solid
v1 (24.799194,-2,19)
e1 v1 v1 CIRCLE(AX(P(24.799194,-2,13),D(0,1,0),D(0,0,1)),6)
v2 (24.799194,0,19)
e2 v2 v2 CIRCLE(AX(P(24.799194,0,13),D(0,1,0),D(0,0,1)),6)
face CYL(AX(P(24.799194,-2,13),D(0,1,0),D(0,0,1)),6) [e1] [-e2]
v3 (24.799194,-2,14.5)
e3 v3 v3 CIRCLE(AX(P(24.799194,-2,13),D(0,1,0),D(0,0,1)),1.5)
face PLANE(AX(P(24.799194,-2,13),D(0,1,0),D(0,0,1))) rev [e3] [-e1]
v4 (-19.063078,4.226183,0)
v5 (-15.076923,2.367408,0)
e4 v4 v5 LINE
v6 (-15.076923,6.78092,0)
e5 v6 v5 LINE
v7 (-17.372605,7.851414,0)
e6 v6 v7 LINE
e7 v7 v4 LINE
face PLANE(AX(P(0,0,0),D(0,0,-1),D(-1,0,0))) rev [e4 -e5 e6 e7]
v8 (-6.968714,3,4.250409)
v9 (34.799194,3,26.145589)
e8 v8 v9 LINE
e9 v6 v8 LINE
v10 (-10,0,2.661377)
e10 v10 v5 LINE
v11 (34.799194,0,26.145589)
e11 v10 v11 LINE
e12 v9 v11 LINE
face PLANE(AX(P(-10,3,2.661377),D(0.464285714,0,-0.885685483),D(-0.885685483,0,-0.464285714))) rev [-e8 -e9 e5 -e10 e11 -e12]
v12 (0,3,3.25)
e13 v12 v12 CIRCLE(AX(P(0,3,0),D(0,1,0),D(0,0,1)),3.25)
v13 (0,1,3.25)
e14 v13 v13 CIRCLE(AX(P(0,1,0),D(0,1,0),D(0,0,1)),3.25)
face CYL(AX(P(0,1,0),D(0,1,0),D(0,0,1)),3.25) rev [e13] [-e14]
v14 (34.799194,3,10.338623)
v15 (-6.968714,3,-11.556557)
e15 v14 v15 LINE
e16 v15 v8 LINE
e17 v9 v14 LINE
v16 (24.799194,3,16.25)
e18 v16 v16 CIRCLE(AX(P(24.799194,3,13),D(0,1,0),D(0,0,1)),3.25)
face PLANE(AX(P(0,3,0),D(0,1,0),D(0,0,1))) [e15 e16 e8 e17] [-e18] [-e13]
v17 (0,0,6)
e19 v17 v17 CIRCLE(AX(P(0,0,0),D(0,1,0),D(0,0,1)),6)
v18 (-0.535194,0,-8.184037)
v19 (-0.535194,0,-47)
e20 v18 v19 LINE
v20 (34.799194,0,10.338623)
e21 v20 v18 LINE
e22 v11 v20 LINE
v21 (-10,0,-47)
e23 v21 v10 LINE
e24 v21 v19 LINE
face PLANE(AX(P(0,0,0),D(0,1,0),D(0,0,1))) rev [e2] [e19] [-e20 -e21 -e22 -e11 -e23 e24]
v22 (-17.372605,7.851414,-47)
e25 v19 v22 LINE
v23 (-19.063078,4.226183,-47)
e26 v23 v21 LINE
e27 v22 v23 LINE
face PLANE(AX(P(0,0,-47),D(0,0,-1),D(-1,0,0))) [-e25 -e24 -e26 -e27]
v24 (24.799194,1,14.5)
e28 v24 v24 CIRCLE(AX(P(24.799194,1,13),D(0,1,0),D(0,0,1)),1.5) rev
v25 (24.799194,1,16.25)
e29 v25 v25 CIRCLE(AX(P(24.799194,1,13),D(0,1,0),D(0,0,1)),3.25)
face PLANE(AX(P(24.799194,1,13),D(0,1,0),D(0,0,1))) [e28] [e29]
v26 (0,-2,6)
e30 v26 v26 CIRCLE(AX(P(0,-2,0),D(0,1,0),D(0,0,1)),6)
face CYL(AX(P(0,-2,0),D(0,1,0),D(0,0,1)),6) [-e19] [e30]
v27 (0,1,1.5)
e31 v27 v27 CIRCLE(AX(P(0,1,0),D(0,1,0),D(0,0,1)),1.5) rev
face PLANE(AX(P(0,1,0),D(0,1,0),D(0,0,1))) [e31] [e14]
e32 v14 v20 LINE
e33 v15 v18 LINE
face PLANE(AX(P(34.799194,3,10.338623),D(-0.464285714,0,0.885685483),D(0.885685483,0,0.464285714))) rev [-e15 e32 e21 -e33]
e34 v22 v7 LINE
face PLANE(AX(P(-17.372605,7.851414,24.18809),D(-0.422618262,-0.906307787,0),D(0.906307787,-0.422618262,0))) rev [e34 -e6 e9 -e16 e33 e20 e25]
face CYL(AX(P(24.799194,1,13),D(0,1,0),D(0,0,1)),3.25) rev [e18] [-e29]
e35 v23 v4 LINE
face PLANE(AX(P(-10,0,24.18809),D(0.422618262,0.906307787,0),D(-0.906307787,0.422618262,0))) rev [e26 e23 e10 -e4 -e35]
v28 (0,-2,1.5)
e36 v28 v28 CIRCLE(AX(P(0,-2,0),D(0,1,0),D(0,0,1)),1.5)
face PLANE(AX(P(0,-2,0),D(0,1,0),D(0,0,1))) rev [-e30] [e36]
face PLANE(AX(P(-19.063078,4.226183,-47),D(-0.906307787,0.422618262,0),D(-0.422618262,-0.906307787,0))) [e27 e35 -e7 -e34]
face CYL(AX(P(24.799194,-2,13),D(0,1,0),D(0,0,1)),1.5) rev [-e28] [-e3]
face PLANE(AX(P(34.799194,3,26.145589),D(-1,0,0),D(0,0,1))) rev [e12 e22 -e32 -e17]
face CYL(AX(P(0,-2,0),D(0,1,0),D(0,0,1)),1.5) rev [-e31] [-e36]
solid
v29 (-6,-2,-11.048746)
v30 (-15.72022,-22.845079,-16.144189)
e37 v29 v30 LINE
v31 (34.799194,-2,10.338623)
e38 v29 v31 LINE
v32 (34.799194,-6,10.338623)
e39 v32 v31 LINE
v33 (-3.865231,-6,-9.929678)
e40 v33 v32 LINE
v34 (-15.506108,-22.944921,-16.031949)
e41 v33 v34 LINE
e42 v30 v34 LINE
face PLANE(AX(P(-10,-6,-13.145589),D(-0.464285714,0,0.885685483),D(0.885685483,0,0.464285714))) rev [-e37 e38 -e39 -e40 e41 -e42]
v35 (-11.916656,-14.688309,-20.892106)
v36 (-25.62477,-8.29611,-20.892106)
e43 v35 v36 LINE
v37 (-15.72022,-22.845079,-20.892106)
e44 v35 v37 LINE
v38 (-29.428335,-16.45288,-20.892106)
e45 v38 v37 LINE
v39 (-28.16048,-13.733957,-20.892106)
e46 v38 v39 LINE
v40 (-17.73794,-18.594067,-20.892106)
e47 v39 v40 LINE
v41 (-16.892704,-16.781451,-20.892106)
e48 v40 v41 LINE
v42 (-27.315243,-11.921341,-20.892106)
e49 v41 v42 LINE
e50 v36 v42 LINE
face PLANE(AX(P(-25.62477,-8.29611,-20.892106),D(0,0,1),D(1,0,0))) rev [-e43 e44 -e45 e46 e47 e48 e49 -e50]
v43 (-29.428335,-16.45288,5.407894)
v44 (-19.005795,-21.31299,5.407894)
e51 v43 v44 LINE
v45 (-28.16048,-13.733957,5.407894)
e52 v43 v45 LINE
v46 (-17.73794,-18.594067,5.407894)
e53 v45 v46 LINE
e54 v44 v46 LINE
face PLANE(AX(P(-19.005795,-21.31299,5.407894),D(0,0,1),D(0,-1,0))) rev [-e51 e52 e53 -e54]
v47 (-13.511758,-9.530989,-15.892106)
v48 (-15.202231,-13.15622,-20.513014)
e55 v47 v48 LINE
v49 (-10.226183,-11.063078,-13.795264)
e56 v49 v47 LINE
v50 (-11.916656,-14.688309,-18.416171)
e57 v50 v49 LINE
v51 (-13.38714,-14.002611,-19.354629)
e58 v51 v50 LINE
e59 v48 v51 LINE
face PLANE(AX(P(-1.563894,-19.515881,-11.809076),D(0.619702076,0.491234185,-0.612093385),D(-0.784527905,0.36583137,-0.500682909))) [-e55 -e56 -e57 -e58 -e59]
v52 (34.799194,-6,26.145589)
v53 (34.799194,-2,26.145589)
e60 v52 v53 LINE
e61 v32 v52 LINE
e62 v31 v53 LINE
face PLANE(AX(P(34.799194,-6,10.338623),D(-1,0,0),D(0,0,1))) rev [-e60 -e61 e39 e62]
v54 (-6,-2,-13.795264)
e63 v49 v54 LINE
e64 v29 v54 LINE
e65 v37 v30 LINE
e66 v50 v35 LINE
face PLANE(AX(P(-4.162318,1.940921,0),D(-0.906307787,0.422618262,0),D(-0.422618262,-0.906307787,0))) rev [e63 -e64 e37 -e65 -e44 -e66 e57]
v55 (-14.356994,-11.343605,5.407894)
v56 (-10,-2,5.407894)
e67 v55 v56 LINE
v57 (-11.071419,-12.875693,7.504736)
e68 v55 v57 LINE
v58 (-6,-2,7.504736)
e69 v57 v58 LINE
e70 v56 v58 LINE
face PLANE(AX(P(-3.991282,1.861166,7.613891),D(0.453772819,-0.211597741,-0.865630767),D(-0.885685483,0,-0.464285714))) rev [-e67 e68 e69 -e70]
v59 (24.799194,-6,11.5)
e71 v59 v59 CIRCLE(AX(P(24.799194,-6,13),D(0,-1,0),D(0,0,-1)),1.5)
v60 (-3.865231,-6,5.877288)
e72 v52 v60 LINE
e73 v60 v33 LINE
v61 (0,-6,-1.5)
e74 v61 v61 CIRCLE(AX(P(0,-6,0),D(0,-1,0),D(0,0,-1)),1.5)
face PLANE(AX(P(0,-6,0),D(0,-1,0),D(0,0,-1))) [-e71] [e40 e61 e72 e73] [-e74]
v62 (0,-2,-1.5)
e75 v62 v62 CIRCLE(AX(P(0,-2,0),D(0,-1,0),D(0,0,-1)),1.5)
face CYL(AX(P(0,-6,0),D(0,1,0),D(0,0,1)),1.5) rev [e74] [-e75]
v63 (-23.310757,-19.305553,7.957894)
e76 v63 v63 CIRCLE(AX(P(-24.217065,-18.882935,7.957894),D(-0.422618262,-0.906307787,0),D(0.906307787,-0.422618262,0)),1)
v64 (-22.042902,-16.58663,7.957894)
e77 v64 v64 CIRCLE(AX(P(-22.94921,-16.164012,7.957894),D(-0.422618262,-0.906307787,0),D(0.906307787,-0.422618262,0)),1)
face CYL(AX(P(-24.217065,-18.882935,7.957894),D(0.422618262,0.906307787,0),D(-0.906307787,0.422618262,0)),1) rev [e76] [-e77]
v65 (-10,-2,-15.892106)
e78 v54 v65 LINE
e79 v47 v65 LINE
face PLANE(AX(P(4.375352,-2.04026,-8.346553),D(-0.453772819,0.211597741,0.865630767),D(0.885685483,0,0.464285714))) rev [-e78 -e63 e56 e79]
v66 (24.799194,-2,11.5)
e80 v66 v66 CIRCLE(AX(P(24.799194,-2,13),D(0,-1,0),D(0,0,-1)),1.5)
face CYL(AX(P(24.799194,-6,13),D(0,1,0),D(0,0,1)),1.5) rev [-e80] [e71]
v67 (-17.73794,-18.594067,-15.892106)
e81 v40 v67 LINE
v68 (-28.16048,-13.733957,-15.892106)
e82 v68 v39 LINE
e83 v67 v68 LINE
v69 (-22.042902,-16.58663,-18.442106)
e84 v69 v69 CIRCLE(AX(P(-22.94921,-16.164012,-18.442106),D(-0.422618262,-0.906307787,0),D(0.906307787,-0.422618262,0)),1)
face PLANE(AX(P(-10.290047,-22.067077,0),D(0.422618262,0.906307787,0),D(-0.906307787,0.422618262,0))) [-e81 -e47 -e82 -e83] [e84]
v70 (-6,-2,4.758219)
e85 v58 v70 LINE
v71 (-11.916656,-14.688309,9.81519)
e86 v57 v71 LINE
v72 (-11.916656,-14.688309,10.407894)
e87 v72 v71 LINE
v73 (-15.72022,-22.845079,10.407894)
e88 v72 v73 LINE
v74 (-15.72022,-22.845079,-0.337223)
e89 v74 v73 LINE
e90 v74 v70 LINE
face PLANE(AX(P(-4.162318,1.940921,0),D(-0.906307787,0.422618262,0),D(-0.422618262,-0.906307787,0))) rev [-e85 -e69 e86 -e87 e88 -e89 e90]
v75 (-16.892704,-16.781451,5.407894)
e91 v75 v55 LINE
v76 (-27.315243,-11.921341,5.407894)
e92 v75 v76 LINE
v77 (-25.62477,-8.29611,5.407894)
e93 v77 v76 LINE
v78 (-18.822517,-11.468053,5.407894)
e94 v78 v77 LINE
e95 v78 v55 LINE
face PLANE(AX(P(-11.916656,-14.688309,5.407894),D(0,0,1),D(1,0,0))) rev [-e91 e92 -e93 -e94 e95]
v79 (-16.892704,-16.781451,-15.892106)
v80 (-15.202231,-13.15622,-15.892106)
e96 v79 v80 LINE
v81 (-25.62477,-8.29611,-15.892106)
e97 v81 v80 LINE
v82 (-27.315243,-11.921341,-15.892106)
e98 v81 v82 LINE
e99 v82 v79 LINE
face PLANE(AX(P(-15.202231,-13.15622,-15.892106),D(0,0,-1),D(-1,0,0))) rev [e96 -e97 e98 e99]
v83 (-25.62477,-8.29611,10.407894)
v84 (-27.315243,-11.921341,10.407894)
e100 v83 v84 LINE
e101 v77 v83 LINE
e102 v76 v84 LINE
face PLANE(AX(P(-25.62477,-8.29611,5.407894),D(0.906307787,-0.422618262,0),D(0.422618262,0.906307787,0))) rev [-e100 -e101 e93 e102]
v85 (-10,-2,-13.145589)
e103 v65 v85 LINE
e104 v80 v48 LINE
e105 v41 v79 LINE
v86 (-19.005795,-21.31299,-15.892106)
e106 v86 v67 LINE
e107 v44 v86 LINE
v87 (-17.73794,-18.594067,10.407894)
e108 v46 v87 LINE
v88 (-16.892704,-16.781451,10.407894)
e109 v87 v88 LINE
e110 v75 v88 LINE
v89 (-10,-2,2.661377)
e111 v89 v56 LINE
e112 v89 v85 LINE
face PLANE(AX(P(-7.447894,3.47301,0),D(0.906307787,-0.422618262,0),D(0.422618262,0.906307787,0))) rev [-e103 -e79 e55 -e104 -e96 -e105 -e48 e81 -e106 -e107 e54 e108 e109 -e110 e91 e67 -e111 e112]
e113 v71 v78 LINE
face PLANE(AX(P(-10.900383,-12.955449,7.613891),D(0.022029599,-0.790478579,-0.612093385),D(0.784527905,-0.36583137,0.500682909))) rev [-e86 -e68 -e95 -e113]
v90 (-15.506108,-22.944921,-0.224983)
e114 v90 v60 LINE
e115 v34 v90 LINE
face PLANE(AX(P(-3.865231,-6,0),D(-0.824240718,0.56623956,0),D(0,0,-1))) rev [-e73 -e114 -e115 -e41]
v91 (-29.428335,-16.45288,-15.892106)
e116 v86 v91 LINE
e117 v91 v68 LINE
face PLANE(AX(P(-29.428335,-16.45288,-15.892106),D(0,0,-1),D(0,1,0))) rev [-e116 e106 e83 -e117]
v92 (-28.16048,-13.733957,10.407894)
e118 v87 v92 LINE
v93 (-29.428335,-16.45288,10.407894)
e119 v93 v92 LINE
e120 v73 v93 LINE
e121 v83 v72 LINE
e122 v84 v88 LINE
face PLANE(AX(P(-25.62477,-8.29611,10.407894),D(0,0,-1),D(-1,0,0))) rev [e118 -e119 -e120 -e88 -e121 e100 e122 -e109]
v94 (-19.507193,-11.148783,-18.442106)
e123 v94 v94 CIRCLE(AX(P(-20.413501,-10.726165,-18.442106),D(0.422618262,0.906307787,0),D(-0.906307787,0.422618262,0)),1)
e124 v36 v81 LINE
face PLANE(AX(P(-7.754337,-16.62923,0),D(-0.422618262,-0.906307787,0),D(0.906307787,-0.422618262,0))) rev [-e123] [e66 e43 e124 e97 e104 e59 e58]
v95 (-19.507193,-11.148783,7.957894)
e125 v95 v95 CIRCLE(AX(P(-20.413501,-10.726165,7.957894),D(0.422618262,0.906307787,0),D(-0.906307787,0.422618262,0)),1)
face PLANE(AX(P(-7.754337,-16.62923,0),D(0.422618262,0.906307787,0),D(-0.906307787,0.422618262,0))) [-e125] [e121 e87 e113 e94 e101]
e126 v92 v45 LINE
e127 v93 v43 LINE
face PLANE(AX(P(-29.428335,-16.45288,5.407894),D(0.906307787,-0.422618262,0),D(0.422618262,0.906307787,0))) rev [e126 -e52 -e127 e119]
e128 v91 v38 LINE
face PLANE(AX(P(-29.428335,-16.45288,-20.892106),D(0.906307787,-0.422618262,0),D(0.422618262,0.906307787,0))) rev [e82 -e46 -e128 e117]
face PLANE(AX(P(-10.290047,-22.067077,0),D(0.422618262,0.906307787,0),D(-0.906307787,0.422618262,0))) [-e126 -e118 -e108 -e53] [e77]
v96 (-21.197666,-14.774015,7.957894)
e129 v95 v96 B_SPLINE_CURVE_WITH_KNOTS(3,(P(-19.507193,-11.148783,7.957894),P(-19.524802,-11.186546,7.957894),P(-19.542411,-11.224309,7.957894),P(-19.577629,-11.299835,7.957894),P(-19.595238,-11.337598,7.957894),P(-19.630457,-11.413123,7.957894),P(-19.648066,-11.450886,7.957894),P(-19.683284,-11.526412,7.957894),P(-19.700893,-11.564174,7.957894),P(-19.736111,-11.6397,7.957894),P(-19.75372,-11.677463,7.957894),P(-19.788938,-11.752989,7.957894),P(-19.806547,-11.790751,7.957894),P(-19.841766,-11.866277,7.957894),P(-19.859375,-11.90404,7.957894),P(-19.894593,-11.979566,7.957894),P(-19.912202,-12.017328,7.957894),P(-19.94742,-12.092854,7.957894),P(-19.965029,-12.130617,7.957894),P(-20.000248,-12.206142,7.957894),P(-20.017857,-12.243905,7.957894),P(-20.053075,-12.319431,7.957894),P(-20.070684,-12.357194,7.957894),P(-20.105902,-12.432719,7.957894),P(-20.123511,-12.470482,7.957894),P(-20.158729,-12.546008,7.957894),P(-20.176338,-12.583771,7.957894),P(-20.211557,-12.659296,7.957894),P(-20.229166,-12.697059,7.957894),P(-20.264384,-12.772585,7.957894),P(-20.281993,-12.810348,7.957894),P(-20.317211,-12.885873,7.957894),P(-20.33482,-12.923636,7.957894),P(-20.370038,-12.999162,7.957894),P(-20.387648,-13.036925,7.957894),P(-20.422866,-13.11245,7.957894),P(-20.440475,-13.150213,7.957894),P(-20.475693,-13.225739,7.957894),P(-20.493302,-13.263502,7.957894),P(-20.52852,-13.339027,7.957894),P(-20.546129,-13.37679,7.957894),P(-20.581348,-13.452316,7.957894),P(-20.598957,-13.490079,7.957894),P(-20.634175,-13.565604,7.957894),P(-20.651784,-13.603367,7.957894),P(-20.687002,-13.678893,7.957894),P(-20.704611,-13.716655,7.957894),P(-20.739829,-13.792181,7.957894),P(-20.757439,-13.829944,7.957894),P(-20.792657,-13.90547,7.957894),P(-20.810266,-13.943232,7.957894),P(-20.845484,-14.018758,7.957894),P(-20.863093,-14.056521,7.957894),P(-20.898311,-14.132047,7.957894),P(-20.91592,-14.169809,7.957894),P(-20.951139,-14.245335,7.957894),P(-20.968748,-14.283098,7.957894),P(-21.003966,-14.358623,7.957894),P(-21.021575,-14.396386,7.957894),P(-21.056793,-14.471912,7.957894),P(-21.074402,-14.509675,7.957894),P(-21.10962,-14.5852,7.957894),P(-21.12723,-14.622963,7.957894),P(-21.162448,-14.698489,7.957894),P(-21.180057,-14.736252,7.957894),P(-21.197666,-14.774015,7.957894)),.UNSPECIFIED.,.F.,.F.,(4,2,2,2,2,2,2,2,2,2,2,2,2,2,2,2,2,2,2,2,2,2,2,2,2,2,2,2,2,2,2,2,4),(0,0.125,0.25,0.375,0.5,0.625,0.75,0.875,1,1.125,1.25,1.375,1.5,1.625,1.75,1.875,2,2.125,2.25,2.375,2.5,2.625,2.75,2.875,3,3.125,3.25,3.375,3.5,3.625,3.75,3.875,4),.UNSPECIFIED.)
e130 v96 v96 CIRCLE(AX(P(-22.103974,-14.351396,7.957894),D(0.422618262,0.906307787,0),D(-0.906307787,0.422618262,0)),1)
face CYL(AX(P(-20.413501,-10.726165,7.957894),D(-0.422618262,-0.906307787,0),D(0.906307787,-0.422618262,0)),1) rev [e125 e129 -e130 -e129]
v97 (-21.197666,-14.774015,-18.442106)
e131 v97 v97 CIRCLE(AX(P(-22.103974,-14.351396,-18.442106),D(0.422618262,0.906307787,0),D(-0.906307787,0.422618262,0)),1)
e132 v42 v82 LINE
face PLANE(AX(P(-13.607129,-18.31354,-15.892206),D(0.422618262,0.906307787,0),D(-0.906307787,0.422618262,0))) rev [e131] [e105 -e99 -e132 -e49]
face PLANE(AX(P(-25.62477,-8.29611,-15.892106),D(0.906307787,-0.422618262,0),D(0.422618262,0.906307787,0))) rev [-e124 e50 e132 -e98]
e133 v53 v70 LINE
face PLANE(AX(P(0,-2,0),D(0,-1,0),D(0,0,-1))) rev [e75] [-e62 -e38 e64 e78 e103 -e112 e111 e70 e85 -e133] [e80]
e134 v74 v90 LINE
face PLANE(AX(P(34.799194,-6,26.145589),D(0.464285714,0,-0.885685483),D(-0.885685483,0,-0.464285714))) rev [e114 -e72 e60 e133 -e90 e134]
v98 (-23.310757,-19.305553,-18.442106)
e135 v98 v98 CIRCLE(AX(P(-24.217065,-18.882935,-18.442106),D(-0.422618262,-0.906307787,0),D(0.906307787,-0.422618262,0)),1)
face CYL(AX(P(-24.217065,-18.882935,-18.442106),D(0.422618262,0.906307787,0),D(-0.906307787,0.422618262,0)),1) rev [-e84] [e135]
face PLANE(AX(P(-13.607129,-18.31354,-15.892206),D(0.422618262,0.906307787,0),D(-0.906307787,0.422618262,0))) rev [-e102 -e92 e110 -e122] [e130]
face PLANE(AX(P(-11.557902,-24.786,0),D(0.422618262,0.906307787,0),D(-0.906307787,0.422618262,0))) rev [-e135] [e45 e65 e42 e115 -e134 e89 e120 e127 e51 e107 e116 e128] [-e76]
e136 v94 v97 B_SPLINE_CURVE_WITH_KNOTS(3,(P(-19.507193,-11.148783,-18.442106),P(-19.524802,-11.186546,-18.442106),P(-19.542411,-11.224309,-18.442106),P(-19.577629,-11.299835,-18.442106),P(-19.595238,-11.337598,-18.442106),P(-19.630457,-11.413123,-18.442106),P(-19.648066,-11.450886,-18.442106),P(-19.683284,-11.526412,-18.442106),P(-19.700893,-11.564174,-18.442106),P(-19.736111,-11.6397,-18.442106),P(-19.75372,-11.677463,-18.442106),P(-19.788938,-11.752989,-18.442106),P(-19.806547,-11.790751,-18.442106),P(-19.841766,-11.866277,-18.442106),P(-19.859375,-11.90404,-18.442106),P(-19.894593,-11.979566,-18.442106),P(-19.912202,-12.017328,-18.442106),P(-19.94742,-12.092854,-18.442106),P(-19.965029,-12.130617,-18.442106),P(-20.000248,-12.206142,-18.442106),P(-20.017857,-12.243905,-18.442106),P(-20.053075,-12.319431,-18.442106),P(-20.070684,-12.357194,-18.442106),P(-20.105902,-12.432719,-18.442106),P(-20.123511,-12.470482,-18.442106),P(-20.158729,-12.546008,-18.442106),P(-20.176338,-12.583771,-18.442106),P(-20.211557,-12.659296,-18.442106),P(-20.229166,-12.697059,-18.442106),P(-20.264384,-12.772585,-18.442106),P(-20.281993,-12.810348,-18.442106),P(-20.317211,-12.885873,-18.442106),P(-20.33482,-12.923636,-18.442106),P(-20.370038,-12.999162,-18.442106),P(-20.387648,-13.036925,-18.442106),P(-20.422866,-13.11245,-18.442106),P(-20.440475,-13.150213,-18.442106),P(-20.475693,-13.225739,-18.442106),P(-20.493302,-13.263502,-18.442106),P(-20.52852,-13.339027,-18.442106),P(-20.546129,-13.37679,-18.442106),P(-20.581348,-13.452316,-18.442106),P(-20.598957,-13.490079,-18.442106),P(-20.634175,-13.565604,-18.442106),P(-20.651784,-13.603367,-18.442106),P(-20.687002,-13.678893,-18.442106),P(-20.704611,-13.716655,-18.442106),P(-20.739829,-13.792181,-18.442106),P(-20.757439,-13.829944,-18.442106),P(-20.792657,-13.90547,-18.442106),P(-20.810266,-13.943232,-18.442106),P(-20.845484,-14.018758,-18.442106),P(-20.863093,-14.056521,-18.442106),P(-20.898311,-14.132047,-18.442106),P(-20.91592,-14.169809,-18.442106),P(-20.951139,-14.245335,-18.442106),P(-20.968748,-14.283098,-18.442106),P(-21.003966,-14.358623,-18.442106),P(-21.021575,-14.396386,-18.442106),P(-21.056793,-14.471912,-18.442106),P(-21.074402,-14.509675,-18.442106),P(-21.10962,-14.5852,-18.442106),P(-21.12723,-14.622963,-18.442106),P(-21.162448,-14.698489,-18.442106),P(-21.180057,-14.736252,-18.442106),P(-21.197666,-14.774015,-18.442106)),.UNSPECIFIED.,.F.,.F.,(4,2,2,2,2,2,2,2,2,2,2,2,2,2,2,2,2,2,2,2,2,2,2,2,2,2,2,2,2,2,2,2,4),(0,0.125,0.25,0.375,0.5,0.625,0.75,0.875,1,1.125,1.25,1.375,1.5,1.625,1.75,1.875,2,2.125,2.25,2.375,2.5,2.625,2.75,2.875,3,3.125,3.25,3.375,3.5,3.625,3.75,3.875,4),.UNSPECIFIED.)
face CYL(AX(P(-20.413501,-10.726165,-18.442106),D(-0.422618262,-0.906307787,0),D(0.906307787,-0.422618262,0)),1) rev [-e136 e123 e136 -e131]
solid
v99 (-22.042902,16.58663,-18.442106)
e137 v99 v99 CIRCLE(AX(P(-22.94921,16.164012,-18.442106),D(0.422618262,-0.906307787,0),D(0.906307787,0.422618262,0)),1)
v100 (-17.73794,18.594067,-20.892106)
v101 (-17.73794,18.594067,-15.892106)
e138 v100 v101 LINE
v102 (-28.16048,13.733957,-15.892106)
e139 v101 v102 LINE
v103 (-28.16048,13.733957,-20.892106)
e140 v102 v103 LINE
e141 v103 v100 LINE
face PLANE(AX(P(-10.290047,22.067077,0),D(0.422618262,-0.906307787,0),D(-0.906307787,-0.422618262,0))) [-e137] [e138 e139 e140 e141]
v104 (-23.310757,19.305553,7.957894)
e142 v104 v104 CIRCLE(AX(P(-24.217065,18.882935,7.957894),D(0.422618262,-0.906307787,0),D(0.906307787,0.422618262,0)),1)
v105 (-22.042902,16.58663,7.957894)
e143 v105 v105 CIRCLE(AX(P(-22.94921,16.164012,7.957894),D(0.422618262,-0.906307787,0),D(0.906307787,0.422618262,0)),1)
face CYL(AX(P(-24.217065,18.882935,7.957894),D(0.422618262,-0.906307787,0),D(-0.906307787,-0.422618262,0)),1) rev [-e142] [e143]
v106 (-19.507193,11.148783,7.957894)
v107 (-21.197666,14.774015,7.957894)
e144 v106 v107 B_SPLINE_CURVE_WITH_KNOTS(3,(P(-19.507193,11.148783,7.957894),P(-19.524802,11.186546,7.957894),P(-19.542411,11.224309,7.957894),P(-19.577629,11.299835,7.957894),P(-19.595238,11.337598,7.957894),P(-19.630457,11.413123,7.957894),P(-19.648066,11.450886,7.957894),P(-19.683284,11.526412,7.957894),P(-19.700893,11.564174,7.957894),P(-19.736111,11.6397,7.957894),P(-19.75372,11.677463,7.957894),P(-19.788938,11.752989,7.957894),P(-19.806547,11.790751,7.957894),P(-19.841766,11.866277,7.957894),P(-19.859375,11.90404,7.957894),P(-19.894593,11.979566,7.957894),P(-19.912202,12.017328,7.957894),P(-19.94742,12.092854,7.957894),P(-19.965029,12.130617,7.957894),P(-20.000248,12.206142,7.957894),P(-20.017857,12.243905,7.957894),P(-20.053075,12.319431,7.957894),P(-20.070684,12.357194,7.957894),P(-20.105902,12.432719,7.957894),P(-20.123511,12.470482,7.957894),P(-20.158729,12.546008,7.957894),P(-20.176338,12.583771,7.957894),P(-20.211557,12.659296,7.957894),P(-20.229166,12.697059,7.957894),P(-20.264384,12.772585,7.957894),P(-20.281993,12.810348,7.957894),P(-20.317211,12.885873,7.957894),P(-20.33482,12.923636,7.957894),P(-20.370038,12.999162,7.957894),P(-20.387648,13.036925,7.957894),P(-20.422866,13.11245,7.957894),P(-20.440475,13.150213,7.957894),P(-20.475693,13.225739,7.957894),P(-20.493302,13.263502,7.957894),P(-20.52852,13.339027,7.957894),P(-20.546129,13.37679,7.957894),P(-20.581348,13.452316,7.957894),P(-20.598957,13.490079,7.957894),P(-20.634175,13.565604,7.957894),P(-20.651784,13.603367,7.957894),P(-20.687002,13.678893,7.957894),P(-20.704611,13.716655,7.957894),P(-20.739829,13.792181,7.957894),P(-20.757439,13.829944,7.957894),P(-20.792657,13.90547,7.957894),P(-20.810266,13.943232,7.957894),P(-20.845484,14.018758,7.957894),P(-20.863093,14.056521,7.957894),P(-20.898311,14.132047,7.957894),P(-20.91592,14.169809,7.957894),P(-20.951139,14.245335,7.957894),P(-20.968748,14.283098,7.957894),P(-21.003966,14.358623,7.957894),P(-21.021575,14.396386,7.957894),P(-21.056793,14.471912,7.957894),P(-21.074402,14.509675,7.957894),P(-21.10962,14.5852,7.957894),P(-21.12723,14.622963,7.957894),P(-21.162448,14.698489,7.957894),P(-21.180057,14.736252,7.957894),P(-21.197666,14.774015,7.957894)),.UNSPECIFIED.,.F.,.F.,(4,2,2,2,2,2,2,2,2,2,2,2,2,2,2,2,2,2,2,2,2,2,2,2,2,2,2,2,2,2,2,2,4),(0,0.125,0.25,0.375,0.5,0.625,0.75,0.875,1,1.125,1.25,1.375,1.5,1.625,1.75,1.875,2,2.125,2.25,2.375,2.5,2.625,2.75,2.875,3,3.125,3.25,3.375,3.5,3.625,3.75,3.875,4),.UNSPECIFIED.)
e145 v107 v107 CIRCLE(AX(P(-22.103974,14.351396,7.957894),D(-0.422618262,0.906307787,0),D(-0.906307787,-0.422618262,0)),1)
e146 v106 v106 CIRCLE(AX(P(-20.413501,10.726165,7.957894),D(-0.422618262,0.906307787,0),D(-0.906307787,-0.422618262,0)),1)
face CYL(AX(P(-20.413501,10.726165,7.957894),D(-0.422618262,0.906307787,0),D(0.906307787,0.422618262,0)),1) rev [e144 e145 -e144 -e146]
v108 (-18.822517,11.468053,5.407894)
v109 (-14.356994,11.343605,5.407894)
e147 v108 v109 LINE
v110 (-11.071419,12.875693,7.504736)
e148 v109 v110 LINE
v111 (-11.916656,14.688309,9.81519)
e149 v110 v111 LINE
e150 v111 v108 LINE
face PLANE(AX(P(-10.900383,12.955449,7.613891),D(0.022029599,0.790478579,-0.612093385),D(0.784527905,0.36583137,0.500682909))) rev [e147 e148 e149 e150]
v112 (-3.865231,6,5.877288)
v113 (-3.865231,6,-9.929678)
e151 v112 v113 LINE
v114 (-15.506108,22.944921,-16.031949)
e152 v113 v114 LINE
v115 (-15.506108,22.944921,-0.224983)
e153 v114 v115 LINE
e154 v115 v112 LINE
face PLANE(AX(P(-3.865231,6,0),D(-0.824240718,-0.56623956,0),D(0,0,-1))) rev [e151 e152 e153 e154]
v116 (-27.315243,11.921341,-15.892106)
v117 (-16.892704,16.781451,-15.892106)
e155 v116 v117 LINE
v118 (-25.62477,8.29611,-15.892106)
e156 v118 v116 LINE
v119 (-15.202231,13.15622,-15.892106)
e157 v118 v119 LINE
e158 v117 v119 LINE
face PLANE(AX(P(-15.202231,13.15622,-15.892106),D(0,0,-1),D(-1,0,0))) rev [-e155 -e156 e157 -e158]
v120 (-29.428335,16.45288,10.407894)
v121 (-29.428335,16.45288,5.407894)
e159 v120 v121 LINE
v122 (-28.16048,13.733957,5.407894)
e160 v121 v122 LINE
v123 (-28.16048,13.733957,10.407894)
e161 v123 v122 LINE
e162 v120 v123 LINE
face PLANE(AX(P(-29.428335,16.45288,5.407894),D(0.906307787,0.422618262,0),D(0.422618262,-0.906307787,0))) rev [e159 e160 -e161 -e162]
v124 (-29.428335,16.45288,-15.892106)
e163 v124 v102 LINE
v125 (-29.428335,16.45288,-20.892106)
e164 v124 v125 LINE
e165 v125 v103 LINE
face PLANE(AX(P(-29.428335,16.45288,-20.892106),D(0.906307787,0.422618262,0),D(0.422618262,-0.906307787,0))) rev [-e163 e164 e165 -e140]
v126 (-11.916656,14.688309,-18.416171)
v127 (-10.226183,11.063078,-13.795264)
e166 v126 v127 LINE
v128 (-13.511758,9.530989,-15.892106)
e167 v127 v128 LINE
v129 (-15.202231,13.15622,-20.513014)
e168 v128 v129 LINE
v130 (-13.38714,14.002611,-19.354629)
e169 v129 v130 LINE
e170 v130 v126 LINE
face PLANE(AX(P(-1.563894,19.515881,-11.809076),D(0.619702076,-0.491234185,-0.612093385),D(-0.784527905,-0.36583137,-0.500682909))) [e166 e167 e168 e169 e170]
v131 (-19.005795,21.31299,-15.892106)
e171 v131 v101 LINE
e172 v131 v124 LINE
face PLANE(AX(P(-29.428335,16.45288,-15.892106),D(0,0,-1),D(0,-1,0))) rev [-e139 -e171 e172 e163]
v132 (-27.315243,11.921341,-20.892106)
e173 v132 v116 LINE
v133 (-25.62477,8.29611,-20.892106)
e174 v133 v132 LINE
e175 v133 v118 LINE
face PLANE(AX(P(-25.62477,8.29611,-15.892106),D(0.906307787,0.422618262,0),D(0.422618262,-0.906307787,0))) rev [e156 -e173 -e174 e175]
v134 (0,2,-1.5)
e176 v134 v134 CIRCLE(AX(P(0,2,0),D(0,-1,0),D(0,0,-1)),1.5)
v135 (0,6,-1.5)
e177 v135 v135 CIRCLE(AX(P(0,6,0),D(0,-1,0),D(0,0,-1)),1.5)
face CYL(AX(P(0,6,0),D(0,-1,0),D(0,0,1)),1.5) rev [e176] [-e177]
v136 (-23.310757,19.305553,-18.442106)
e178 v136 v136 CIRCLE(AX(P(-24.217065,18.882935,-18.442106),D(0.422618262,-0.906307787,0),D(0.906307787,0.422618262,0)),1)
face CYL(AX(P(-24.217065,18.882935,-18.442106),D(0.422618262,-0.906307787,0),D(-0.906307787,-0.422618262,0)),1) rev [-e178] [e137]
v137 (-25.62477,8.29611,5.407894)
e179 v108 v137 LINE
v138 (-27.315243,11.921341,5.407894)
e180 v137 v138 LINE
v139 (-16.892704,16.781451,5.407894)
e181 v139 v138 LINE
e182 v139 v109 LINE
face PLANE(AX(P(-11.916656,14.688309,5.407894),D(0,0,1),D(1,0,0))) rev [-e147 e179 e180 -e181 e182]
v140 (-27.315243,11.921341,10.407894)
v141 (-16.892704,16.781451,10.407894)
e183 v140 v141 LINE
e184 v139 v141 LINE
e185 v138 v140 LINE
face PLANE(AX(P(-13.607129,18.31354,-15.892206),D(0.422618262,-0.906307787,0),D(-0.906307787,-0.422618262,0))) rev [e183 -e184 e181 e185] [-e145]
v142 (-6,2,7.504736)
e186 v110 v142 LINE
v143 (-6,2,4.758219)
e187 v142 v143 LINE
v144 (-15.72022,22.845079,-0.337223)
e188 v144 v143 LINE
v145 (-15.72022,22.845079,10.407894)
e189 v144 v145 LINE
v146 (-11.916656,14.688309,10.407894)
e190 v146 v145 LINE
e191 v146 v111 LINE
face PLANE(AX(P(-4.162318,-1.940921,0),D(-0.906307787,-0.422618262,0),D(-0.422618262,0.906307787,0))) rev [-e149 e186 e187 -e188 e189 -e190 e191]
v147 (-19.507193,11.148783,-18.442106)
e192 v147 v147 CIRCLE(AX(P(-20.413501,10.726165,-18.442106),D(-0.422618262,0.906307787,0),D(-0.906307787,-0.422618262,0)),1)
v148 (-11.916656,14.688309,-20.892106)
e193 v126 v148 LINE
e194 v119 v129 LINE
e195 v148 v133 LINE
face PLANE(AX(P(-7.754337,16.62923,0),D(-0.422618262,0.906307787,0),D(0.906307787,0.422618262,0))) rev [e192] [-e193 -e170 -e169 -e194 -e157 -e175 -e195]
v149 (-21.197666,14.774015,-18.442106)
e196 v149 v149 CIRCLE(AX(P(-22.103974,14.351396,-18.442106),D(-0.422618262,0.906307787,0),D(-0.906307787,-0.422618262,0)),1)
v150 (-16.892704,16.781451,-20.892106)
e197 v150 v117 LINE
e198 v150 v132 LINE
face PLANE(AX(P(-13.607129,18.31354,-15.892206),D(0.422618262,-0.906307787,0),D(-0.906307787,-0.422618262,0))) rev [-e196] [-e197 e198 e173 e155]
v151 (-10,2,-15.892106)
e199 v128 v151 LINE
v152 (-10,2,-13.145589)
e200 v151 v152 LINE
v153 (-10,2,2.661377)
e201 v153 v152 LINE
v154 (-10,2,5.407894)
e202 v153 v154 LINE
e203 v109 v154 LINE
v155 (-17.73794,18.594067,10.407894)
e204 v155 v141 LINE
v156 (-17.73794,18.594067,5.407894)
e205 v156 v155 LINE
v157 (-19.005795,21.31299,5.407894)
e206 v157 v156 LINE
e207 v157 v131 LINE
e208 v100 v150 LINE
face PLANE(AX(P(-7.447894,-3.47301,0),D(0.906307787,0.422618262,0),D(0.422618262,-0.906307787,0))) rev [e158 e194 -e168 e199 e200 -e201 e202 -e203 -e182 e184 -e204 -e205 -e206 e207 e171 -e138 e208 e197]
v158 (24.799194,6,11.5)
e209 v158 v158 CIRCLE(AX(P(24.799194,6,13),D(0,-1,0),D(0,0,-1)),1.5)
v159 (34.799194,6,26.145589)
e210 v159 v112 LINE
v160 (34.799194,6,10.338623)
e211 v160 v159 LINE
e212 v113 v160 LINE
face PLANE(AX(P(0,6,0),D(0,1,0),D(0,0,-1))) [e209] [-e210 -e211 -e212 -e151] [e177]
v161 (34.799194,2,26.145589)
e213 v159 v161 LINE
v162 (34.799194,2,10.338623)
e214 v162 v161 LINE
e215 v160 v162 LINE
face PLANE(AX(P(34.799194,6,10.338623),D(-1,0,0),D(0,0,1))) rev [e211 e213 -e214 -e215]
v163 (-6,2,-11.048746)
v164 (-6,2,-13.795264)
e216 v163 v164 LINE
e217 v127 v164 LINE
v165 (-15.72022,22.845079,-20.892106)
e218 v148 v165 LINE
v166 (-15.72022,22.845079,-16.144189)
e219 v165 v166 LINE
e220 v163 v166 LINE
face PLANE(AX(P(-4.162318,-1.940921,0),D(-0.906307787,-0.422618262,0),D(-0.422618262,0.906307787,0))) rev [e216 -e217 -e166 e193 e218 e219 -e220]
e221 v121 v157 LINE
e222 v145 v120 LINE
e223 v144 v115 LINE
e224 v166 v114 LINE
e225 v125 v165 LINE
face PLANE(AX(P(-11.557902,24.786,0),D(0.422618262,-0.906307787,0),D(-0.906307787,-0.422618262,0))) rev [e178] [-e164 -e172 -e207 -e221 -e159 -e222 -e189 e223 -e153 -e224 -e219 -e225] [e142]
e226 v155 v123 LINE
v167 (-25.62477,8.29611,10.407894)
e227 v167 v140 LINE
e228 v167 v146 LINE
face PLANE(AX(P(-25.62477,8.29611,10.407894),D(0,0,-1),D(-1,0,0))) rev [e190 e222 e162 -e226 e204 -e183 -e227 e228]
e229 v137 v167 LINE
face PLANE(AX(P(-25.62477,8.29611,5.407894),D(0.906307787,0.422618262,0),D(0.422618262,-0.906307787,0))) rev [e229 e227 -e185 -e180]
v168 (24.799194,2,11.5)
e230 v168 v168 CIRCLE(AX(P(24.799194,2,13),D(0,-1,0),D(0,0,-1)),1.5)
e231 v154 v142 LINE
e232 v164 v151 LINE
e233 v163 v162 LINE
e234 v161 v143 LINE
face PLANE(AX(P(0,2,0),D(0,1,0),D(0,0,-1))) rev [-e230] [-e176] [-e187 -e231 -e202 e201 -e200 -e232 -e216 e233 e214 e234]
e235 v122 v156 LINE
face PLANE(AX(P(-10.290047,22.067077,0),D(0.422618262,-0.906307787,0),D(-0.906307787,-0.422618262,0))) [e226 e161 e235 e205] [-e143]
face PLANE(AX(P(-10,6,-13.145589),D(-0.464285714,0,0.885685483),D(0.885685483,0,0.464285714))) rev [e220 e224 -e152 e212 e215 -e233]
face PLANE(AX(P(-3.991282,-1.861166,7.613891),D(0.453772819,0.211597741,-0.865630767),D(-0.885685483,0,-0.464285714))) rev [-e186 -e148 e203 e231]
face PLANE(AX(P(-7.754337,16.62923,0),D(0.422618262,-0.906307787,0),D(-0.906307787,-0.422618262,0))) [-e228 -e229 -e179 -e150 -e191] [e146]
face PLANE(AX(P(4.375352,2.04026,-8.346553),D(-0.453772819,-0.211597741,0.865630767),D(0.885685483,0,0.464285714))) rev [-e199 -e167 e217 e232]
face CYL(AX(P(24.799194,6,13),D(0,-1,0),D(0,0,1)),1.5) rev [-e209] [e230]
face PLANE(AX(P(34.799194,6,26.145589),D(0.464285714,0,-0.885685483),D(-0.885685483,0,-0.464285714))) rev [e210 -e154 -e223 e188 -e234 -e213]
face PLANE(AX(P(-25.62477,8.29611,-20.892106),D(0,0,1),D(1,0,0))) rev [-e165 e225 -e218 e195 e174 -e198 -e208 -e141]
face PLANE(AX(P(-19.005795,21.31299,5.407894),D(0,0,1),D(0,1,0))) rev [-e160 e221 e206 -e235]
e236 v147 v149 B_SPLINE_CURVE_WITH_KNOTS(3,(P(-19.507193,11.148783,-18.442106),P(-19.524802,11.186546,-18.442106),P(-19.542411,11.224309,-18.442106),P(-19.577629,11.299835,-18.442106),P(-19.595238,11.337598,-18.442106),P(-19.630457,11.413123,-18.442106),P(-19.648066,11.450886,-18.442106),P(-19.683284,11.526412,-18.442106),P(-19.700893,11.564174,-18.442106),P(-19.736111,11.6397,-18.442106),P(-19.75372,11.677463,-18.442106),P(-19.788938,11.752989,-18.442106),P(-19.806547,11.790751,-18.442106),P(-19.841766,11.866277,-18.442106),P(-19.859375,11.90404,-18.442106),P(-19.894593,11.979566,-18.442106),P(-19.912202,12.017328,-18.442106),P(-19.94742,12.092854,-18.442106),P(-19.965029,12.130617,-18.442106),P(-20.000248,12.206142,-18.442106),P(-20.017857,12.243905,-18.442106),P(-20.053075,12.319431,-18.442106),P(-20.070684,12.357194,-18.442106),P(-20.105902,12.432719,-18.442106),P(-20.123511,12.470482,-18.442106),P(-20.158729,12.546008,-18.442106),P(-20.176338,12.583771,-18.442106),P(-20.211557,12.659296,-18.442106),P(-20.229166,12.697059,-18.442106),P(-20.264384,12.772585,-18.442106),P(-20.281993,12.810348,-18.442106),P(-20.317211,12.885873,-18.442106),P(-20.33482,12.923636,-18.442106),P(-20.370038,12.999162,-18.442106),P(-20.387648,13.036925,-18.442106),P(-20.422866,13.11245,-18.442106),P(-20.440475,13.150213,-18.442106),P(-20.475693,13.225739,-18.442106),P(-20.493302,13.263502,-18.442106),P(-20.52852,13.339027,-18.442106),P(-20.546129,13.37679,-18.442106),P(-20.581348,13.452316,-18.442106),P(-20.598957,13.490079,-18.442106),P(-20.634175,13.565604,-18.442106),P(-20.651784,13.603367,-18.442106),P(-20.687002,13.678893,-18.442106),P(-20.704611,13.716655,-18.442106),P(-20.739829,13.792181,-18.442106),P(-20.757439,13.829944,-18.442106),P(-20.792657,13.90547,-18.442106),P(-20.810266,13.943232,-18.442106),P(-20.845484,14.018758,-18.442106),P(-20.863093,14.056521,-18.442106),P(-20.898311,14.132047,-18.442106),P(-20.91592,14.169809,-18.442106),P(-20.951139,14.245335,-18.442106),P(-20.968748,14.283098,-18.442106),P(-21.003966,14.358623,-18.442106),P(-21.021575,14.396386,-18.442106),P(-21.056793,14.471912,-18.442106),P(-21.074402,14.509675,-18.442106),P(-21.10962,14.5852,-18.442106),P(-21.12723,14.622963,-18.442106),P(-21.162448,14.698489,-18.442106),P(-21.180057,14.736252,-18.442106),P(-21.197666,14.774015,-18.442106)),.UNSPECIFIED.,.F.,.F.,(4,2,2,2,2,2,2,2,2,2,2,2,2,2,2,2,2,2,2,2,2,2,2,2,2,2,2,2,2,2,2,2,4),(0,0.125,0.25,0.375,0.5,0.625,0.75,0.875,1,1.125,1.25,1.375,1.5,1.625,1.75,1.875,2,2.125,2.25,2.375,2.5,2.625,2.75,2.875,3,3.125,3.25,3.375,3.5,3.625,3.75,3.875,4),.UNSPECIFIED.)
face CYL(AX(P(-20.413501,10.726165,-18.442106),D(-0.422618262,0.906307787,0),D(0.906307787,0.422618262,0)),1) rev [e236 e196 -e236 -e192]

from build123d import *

# Parameters (mm, degrees)
BOSS_EXTRUDE1_DEPTH             = 3
SKETCH1_R                       = 6
BOSS_EXTRUDE3_DEPTH             = 2
SKETCH4_R                       = 1.5
CUT_EXTRUDE1_DEPTH              = 44.812962497
SKETCH5_R                       = 3.25
CUT_EXTRUDE2_DEPTH              = 2
SKETCH6_R                       = 1.5
BOSS_EXTRUDE4_DEPTH             = 4
CUT_EXTRUDE3_DEPTH              = 48.222467532
CUT_EXTRUDE3_DEPTH_BACK         = 48.222467532
SKETCH9_W                       = 15.125231148
SKETCH9_H                       = 5
SKETCH9_R                       = 1
BOSS_EXTRUDE6_DEPTH             = 4
SKETCH10_W                      = 3.625231148
SKETCH10_H                      = 31.3
BOSS_EXTRUDE7_DEPTH             = 2
SKETCH11_R                      = 1
BOSS_EXTRUDE8_DEPTH             = 3
CHAMFER2_SIZE                   = 4
CHAMFER3_SIZE                   = 2
CHAMFER4_SIZE                   = 4
CHAMFER4_SIZE_2                 = 20
BOSS_EXTRUDE9_DEPTH             = 47
BOSS_EXTRUDE9_DIRECTION_2_REACH = 51.204
SKETCH19_R                      = 3.25
CUT_EXTRUDE4_DEPTH              = 64.192904103
SKETCH20_R                      = 1.5
CUT_EXTRUDE5_DEPTH              = 64.192904103


with BuildPart() as part:
    # Sketch3 → Boss-Extrude1 (new body)
    with BuildSketch(Plane(origin=(0, 0, 0), x_dir=(1, 0, 0), z_dir=(0, 1, 0))):
        Polygon((-10, 13.145588768), (-10, -2.661376867), (34.799193535, -26.145588768), (34.799193535, -10.338623133), align=None)
    extrude(amount=BOSS_EXTRUDE1_DEPTH)

    # Sketch1 → Boss-Extrude3 (add)
    with BuildSketch(Plane(origin=(0, 0, 0), x_dir=(1, 0, 0), z_dir=(0, 1, 0))):
        with Locations(Location((0, 0, 0), (0, 0, 270))):
            Circle(SKETCH1_R)
        with Locations(Location((24.799193535, -13, 0), (0, 0, 270))):
            Circle(SKETCH1_R)
    extrude(amount=-BOSS_EXTRUDE3_DEPTH)

    # Sketch4 → Cut-Extrude1 (cut, through all)
    with BuildSketch(Plane(origin=(0, 3, 0), x_dir=(1, 0, 0), z_dir=(0, 1, 0))):
        with Locations(Location((0, 0, 0), (0, 0, 270))):
            Circle(SKETCH4_R)
        with Locations(Location((24.799193535, -13, 0), (0, 0, 270))):
            Circle(SKETCH4_R)
    extrude(amount=-CUT_EXTRUDE1_DEPTH, mode=Mode.SUBTRACT)

    # Sketch5 → Cut-Extrude2 (cut)
    with BuildSketch(Plane(origin=(0, 3, 0), x_dir=(1, 0, 0), z_dir=(0, 1, 0))):
        with Locations(Location((0, 0, 0), (0, 0, 270))):
            Circle(SKETCH5_R)
        with Locations(Location((24.799193535, -13, 0), (0, 0, 270))):
            Circle(SKETCH5_R)
    extrude(amount=-CUT_EXTRUDE2_DEPTH, mode=Mode.SUBTRACT)

    # Sketch18 → Boss-Extrude9 (add)
    with BuildSketch(Plane.XY):
        Polygon((-10, 0), (-19.06307787, 4.226182617), (-17.372604823, 7.851413766), (-0.535193667, 0), align=None)
    extrude(amount=-BOSS_EXTRUDE9_DEPTH)

    # Boss-Extrude9 direction 2: up to this face of the body (flat: up to its plane)
    boss_extrude9_direction_2_end = Plane(part.part.faces().sort_by_distance((12.399596768, 1.5, 14.403482818))[0])
    # Sketch18 → Boss-Extrude9 direction 2 (add, up to the picked face)
    with BuildSketch(Plane.XY, mode=Mode.PRIVATE) as boss_extrude9_direction_2_sk1:
        Polygon((-10, 0), (-19.06307787, 4.226182617), (-17.372604823, 7.851413766), (-0.535193667, 0), align=None)
    boss_extrude9_direction_2_tool1 = split(extrude(boss_extrude9_direction_2_sk1.sketch, amount=BOSS_EXTRUDE9_DIRECTION_2_REACH, mode=Mode.PRIVATE), bisect_by=boss_extrude9_direction_2_end, keep=Keep.BOTH, mode=Mode.PRIVATE)
    add(boss_extrude9_direction_2_tool1.solids().sort_by(Axis((-11.463687, 3.110079, 0), (0, 0, 1)))[0])

    # Sketch19 → Cut-Extrude4 (cut, through all)
    with BuildSketch(Plane(origin=(0, 1, 0), x_dir=(1, 0, 0), z_dir=(0, 1, 0))):
        with Locations(Location((0, 0, 0), (0, 0, 270))):
            Circle(SKETCH19_R)
    extrude(amount=CUT_EXTRUDE4_DEPTH, mode=Mode.SUBTRACT)

    # Sketch20 → Cut-Extrude5 (cut, through all)
    with BuildSketch(Plane(origin=(0, 1, 0), x_dir=(1, 0, 0), z_dir=(0, 1, 0))):
        with Locations(Location((0, 0, 0), (0, 0, 90))):
            Circle(SKETCH20_R)
    extrude(amount=-CUT_EXTRUDE5_DEPTH, mode=Mode.SUBTRACT)


with BuildPart() as body_2:
    # Sketch6 → Boss-Extrude4 (new body)
    with BuildSketch(Plane.XZ.offset(2)):
        Polygon((-10, 2.661376867), (-10, -13.145588768), (34.799193535, 10.338623133), (34.799193535, 26.145588768), align=None)
        with Locations(Location((0, 0, 0), (0, 0, 270))):
            Circle(SKETCH6_R, mode=Mode.SUBTRACT)
        with Locations(Location((24.799193535, 13, 0), (0, 0, 270))):
            Circle(SKETCH6_R, mode=Mode.SUBTRACT)
    extrude(amount=BOSS_EXTRUDE4_DEPTH)

    # Sketch16 → Loft1 section 0
    with BuildSketch(Plane(origin=(0, -18.313540167, 0), x_dir=(-1, 0, 0), z_dir=(0, -1, 0))):
        with BuildLine():
            Line((13.607128711, -7.50473643), (13.607128711, 13.79526357))
            Line((13.607128711, 13.79526357), (17.607128711, 15.892105951))
            Line((17.607128711, 15.892105951), (17.607128711, -5.407894049))
            Line((17.607128711, -5.407894049), (13.607128711, -7.50473643))
        make_face()
    # Sketch7 → Loft1 section 1
    with BuildSketch(Plane(origin=(0, -2, 0), x_dir=(1, 0, 0), z_dir=(0, 1, 0))):
        with BuildLine():
            Line((-10, 15.892105951), (-10, -5.407894049))
            Line((-10, -5.407894049), (-6, -7.50473643))
            Line((-6, -7.50473643), (-6, 13.79526357))
            Line((-6, 13.79526357), (-10, 15.892105951))
        make_face()
    loft()

    # Sketch17 → Cut-Extrude3 (cut, two sides: drawn at the far end of the back side and taken through both)
    with BuildSketch(Plane.XY.offset(-CUT_EXTRUDE3_DEPTH_BACK)):
        Polygon((-17.607128711, -18.313540167), (-13.607128711, -18.313540167), (-16.892703931, -16.78145128), align=None)
    extrude(amount=CUT_EXTRUDE3_DEPTH + CUT_EXTRUDE3_DEPTH_BACK, mode=Mode.SUBTRACT)

    # Sketch9 → Boss-Extrude6 (add)
    # profile 1 of 2: a face of its own
    with BuildSketch(Plane(origin=(-26.705419865, -12.205706693, 0), x_dir=(-0.9063077870366525, 0.42261826174069417, 0), z_dir=(0.4226182617406941, 0.9063077870366524, 0))):
        with Locations((-6.889749661, 7.907894049)):
            Rectangle(SKETCH9_W, SKETCH9_H)
        with Locations(Location((-5.077134087, 7.957894049, 0), (0, 0, 180))):
            Circle(SKETCH9_R, mode=Mode.SUBTRACT)
    # profile 2 of 2: a face of its own
    with BuildSketch(Plane(origin=(-26.705419865, -12.205706693, 0), x_dir=(-0.9063077870366525, 0.42261826174069417, 0), z_dir=(0.4226182617406941, 0.9063077870366524, 0))):
        Polygon((-10.827134087, -15.892105951), (0.672865913, -15.892105951), (0.672865913, -20.892105951), (-14.452365235, -20.892105951), (-14.452365235, -15.892105951), (-14.452365235, -13.79526357), align=None)
        with Locations(Location((-5.077134087, -18.442105951, 0), (0, 0, 180))):
            Circle(SKETCH9_R, mode=Mode.SUBTRACT)
    extrude(amount=BOSS_EXTRUDE6_DEPTH)

    # Sketch10 → Boss-Extrude7 (add)
    with BuildSketch(Plane(origin=(-50.114461272, -1.289891415, 0), x_dir=(-0.9063077870366525, 0.42261826174069417, 0), z_dir=(0.4226182617406941, 0.9063077870366524, 0))):
        with Locations((-38.468769054, -5.242105951)):
            Rectangle(SKETCH10_W, SKETCH10_H)
    extrude(amount=-BOSS_EXTRUDE7_DEPTH)

    # Sketch11 → Boss-Extrude8 (add)
    with BuildSketch(Plane(origin=(-10.290046849, -22.06707668, 0), x_dir=(0.9063077870366528, -0.4226182617406936, 0), z_dir=(-0.4226182617406936, -0.9063077870366528, 0))):
        Polygon((-19.717841347, 10.407894049), (-4.592610199, 10.407894049), (-4.592610199, -20.892105951), (-19.717841347, -20.892105951), (-19.717841347, -15.892105951), (-8.217841347, -15.892105951), (-8.217841347, 5.407894049), (-19.717841347, 5.407894049), align=None)
        with Locations((-13.967841347, -18.442105951)):
            Circle(SKETCH11_R, mode=Mode.SUBTRACT)
        with Locations((-13.967841347, 7.957894049)):
            Circle(SKETCH11_R, mode=Mode.SUBTRACT)
    extrude(amount=BOSS_EXTRUDE8_DEPTH)

    # Chamfer2
    # the kernel refuses this chamfer: 4 mm, written as the material it adds along each edge
    with BuildSketch(Plane(origin=(-3.8464274, -18.451518261, -8.644872691), x_dir=(0.4419809959760686, -0.23643746629724946, -0.8653034864872206), z_dir=(-0.7845279046867107, 0.36583136999170246, -0.5006829091329899))) as chamfer2_piece_1_section:
        Polygon((CHAMFER2_SIZE * 0.999621916911, -CHAMFER2_SIZE * 0.0274958766106), (-CHAMFER2_SIZE * 0.0274958766106, -CHAMFER2_SIZE * 0.999621916911), (0, 0), align=None)
    chamfer2_piece_1 = extrude(amount=24.761428665, mode=Mode.PRIVATE)
    chamfer2_piece_1 = split(chamfer2_piece_1, bisect_by=Plane(origin=(-11.168720037, -13.084355891, -15.118782346), z_dir=(-0.9063077870366527, 0.4226182617406936, 0)), keep=Keep.TOP, mode=Mode.PRIVATE)
    chamfer2_piece_1 = split(chamfer2_piece_1, bisect_by=Plane(origin=(-14.454295257, -11.552267004, -15.118782346), z_dir=(0.9063077870366528, -0.4226182617406935, 0)), keep=Keep.TOP, mode=Mode.PRIVATE)
    add(chamfer2_piece_1)

    # Chamfer3
    # the kernel refuses this chamfer: 2 mm, written as the material it adds along each edge
    with BuildSketch(Plane(origin=(-7.881541532, -16.56991364, 10.079931869), x_dir=(0.43493535837395614, 0.900147062018719, -0.023801276755393234), z_dir=(-0.7845279046867109, 0.36583136999170235, -0.5006829091329895))) as chamfer3_piece_1_section:
        Polygon((CHAMFER3_SIZE * 0.999621916911, -CHAMFER3_SIZE * 0.0274958766106), (-CHAMFER3_SIZE * 0.0274958766106, -CHAMFER3_SIZE * 0.999621916911), (0, 0), align=None)
    chamfer3_piece_1 = extrude(amount=14.474696714, mode=Mode.PRIVATE)
    chamfer3_piece_1 = split(chamfer3_piece_1, bisect_by=Plane(origin=(-11.638128642, -14.091005892, 7.219593403), z_dir=(-0.9063077870365974, 0.42261826174081224, 0)), keep=Keep.TOP, mode=Mode.PRIVATE)
    chamfer3_piece_1 = split(chamfer3_piece_1, bisect_by=Plane(origin=(-14.923703861, -12.558917005, 7.219593403), z_dir=(0.9063077870365974, -0.42261826174081224, 0)), keep=Keep.TOP, mode=Mode.PRIVATE)
    chamfer3_piece_1 = split(chamfer3_piece_1, bisect_by=Plane(origin=(-13.279775159, -13.325493549, 5.407894049), z_dir=(0, 0, 1)), keep=Keep.TOP, mode=Mode.PRIVATE)
    add(chamfer3_piece_1)
    with BuildSketch(Plane(origin=(-7.881541532, -16.56991364, 10.079931869), x_dir=(0.43493535837395614, 0.900147062018719, -0.023801276755393234), z_dir=(-0.7845279046867109, 0.36583136999170235, -0.5006829091329895))) as chamfer3_piece_2_section:
        Polygon((CHAMFER3_SIZE * 0.999621916911, -CHAMFER3_SIZE * 0.0274958766106), (-CHAMFER3_SIZE * 0.0274958766106, -CHAMFER3_SIZE * 0.999621916911), (0, 0), align=None)
    chamfer3_piece_2 = extrude(amount=14.474696714, mode=Mode.PRIVATE)
    chamfer3_piece_2 = split(chamfer3_piece_2, bisect_by=Plane(origin=(-15.009693587, -12.743322567, 6.010096265), z_dir=(-0.9063077870365974, 0.42261826174081224, 0)), keep=Keep.TOP, mode=Mode.PRIVATE)
    chamfer3_piece_2 = split(chamfer3_piece_2, bisect_by=Plane(origin=(-15.953293685, -12.303314615, 5.407894049), z_dir=(0, 0, 1)), keep=Keep.TOP, mode=Mode.PRIVATE)
    add(chamfer3_piece_2)

    # Chamfer4
    # the kernel refuses this chamfer: 20, 4 mm, written as the material it adds along each edge
    with BuildSketch(Plane(origin=(-7.865230633, -6, -64.000203695), x_dir=(0.9892134397382245, 0.14648129792321618, 0), z_dir=(0, 0, 1))) as chamfer4_piece_1_section:
        Polygon((CHAMFER4_SIZE * 0.989213439738, -CHAMFER4_SIZE * 0.146481297923), (-CHAMFER4_SIZE_2 * 0.550816805356, -CHAMFER4_SIZE_2 * 0.83462617197), (0, 0), align=None)
    chamfer4_piece_1 = extrude(amount=119.75433293, mode=Mode.PRIVATE)
    chamfer4_piece_1 = split(chamfer4_piece_1, bisect_by=Plane(origin=(-17.061497647, -14.46567413, -1.040335016), z_dir=(0.4642857142857141, 0, -0.8856854834026604)), keep=Keep.TOP, mode=Mode.PRIVATE)
    chamfer4_piece_1 = split(chamfer4_piece_1, bisect_by=Plane(origin=(-10.561497647, -14.46567413, -13.439931784), z_dir=(-0.4642857142857143, 0, 0.8856854834026603)), keep=Keep.TOP, mode=Mode.PRIVATE)
    chamfer4_piece_1 = split(chamfer4_piece_1, bisect_by=Plane(origin=(-14.743147871, -23.300695327, -13.322016998), z_dir=(0.4226182617406936, 0.9063077870366527, 0)), keep=Keep.TOP, mode=Mode.PRIVATE)
    add(chamfer4_piece_1)


with BuildPart() as body_3:
    # Mirror1: mirrored copy
    add(body_2.part.mirror(Plane.ZX))


solid = Compound([part.part, body_2.part, body_3.part])
